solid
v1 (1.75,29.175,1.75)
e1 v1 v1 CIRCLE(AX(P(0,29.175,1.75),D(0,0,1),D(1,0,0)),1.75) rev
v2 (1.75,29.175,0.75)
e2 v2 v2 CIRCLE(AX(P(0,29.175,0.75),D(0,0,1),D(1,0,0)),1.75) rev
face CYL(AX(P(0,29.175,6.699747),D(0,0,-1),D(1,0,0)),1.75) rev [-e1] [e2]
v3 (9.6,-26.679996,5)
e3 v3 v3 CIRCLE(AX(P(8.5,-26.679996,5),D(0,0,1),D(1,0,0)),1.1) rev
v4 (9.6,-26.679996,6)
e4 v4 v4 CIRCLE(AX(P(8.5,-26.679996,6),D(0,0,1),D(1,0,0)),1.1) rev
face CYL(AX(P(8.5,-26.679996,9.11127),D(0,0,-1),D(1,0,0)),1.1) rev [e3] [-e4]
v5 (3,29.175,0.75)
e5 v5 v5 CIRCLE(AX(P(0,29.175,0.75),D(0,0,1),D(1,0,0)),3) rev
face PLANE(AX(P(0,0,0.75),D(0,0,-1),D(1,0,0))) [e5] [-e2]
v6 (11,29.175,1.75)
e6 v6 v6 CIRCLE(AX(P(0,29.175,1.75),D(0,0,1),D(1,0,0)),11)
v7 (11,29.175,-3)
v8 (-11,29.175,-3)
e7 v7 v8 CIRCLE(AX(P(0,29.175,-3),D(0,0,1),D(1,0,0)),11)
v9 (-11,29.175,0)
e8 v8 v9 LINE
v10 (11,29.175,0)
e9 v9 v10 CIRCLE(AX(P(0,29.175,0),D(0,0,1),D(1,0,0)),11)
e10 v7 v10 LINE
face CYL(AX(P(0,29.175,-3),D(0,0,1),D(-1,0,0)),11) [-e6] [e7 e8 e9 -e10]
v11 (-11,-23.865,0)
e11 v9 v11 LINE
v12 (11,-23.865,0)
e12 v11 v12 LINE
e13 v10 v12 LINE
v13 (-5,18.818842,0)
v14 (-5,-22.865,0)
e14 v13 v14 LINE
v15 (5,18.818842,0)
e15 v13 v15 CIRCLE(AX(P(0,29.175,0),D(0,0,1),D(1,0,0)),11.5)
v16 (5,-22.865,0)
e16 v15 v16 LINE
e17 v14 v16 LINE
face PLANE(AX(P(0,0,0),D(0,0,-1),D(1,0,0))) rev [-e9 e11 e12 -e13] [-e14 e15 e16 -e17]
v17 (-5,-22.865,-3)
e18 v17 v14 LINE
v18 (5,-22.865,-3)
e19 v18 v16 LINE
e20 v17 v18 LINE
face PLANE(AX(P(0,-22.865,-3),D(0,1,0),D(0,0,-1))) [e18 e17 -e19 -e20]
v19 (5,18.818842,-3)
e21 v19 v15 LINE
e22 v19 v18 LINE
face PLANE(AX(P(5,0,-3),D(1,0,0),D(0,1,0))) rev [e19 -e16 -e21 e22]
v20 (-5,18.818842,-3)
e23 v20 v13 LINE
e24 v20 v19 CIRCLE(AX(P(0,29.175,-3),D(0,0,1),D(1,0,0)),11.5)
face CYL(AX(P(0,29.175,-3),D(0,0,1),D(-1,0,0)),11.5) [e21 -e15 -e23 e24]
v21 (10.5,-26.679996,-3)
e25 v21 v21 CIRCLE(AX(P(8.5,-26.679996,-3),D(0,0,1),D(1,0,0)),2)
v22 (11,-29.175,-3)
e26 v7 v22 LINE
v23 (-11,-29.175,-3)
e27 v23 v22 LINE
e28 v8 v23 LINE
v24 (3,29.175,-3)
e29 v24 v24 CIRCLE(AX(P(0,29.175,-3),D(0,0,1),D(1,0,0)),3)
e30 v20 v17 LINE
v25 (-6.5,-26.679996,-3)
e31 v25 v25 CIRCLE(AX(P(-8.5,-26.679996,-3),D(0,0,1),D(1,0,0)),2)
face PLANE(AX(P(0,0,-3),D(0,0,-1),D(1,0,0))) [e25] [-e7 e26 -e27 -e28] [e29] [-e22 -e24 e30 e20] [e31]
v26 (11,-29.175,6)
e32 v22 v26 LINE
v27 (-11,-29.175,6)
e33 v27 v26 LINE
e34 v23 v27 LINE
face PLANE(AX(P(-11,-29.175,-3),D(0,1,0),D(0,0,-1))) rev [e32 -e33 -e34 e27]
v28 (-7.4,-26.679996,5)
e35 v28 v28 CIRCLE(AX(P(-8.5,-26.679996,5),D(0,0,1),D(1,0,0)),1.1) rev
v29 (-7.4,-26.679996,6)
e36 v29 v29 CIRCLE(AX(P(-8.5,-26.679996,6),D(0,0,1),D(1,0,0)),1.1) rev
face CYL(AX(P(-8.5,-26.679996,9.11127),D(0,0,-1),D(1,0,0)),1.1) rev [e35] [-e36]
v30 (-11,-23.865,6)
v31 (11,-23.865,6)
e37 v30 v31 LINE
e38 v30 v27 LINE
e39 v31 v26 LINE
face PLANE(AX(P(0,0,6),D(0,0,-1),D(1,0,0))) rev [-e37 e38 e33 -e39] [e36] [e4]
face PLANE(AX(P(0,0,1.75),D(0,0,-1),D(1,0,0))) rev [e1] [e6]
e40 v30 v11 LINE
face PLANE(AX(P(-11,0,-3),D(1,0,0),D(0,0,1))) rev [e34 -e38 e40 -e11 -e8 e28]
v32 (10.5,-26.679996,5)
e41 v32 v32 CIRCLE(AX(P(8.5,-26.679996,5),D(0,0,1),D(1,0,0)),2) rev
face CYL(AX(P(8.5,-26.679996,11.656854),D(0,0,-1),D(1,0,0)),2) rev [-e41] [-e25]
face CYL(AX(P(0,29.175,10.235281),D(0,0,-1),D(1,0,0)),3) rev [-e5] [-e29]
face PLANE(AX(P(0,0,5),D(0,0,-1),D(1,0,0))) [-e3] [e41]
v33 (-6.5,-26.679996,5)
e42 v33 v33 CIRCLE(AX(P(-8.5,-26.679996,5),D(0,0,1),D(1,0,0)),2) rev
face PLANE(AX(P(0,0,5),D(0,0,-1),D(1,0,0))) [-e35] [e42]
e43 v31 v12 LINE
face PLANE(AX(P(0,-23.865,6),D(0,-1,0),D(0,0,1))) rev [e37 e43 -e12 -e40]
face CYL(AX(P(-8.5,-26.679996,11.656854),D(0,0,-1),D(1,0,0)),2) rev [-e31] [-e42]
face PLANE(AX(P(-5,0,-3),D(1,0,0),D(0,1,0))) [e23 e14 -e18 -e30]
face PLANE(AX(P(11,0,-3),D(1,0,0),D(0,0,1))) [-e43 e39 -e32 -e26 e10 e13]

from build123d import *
from build123d.topology import SkipClean

# Parameters (mm, degrees)
BOSS_EXTRUDE1_DEPTH           = 3
BOSS_EXTRUDE2_START           = -1.75
SKETCH1_3_R                   = 11
BOSS_EXTRUDE2_DEPTH           = 1.75
SKETCH2_R                     = 1.75
CUT_EXTRUDE1_DEPTH            = 4.75
SKETCH2_3_R                   = 3
CUT_EXTRUDE2_DEPTH            = 3.75
SKETCH1_6_W                   = 11
SKETCH1_6_H                   = 5.31
BOSS_EXTRUDE3_DEPTH           = 6
SKETCH3_R                     = 1.1
CUT_EXTRUDE3_DEPTH            = 9
SKETCH3_3_R                   = 2
SKETCH3_3_R_2                 = 1.1
CUT_EXTRUDE4_DEPTH            = 8
BODY_MOVE_COPY1_START         = -3
BODY_MOVE_COPY1_OUTLINE_R     = 3
BODY_MOVE_COPY1_DEPTH         = 3
BODY_MOVE_COPY1_START_2       = 3
BODY_MOVE_COPY1_2_OUTLINE_W   = 22
BODY_MOVE_COPY1_2_OUTLINE_H   = 5.31
BODY_MOVE_COPY1_2_OUTLINE_R   = 2
BODY_MOVE_COPY1_2_DEPTH       = 3
BODY_MOVE_COPY1_START_3       = 0.75
BODY_MOVE_COPY1_3_OUTLINE_R   = 3
BODY_MOVE_COPY1_3_OUTLINE_R_2 = 1.75
BODY_MOVE_COPY1_3_DEPTH       = 1
BODY_MOVE_COPY1_START_4       = 5
BODY_MOVE_COPY1_4_OUTLINE_R   = 2
BODY_MOVE_COPY1_4_OUTLINE_R_2 = 1.1
BODY_MOVE_COPY1_4_DEPTH       = 1
BODY_MOVE_COPY1_5_DEPTH       = 3
BODY_MOVE_COPY1_START_5       = 1.75
BODY_MOVE_COPY1_6_OUTLINE_R   = 11
BODY_MOVE_COPY1_6_OUTLINE_R_2 = 3
BODY_MOVE_COPY1_6_DEPTH       = 1.25
BODY_MOVE_COPY1_START_6       = -6
BODY_MOVE_COPY1_7_OUTLINE_W   = 22
BODY_MOVE_COPY1_7_OUTLINE_H   = 5.31
BODY_MOVE_COPY1_7_OUTLINE_R   = 1.1
BODY_MOVE_COPY1_7_DEPTH       = 3
BODY_MOVE_COPY1_START_7       = -1.75
BODY_MOVE_COPY1_8_OUTLINE_R   = 3
BODY_MOVE_COPY1_8_OUTLINE_R_2 = 1.75
BODY_MOVE_COPY1_8_DEPTH       = 1


# Read off the part's stored shape, not the designer's step: Body-Move/Copy1
with BuildPart() as part:
    # Sketch1 → Boss-Extrude1 (new body)
    with BuildSketch(Plane.XY):
        with BuildLine():
            Line((-11, 29.175), (-11, -29.175))
            Line((-11, -29.175), (11, -29.175))
            Line((11, -29.175), (11, 29.175))
            ThreePointArc((11, 29.175), (0, 40.175), (-11, 29.175))
        make_face()
        with BuildLine():
            Line((5, -22.865), (-5, -22.865))
            Line((-5, -22.865), (-5, 18.818842411))
            ThreePointArc((-5, 18.818842411), (0, 17.675), (5, 18.818842411))
            Line((5, 18.818842411), (5, -22.865))
        make_face(mode=Mode.SUBTRACT)
    extrude(amount=BOSS_EXTRUDE1_DEPTH)

    # Sketch1<3> → Boss-Extrude2 (add)
    with BuildSketch(Plane.XY.offset(BOSS_EXTRUDE2_START)):
        with Locations((0, 29.175)):
            Circle(SKETCH1_3_R)
    extrude(amount=BOSS_EXTRUDE2_DEPTH)

    # Sketch2 → Cut-Extrude1 (cut)
    with BuildSketch(Plane.XY.offset(3)):
        with Locations((0, 29.175)):
            Circle(SKETCH2_R)
    extrude(amount=-CUT_EXTRUDE1_DEPTH, mode=Mode.SUBTRACT)

    # Sketch2<3> → Cut-Extrude2 (cut)
    with BuildSketch(Plane.XY.offset(3)):
        with Locations((0, 29.175)):
            Circle(SKETCH2_3_R)
    extrude(amount=-CUT_EXTRUDE2_DEPTH, mode=Mode.SUBTRACT)

    # Sketch1<6> → Boss-Extrude3 (add)
    with BuildSketch(Plane.XY):
        with Locations((5.5, -26.52)):
            Rectangle(SKETCH1_6_W, SKETCH1_6_H)
        with Locations((-5.5, -26.52)):
            Rectangle(SKETCH1_6_W, SKETCH1_6_H)
    extrude(amount=-BOSS_EXTRUDE3_DEPTH)

    # Sketch3 → Cut-Extrude3 (cut)
    with BuildSketch(Plane.XY.offset(3)):
        with Locations((-8.5, -26.67999607)):
            Circle(SKETCH3_R)
        with Locations((8.5, -26.67999607)):
            Circle(SKETCH3_R)
    extrude(amount=-CUT_EXTRUDE3_DEPTH, mode=Mode.SUBTRACT)

    # Sketch3<3> → Cut-Extrude4 (cut)
    # profile 1 of 2: a face of its own
    with BuildSketch(Plane.XY.offset(3)):
        with Locations((-8.5, -26.67999607)):
            Circle(SKETCH3_3_R)
        with Locations((-8.5, -26.67999607)):
            Circle(SKETCH3_3_R_2, mode=Mode.SUBTRACT)
    # profile 2 of 2: a face of its own
    with BuildSketch(Plane.XY.offset(3)):
        with Locations((8.5, -26.67999607)):
            Circle(SKETCH3_3_R)
        with Locations((8.5, -26.67999607)):
            Circle(SKETCH3_3_R_2, mode=Mode.SUBTRACT)
    extrude(amount=-CUT_EXTRUDE4_DEPTH, mode=Mode.SUBTRACT)

    # Body-Move/Copy1 outline → Body-Move/Copy1 (add)
    with BuildSketch(Plane.XY.offset(BODY_MOVE_COPY1_START)):
        with BuildLine():
            Line((-11, 29.175), (-11, -23.865))
            Line((-11, -23.865), (11, -23.865))
            Line((11, -23.865), (11, 29.175))
            ThreePointArc((11, 29.175), (0, 40.175), (-11, 29.175))
        make_face()
        with BuildLine():
            Line((-5, -22.865), (-5, 18.818842411))
            ThreePointArc((-5, 18.818842411), (0, 17.675), (5, 18.818842411))
            Line((5, 18.818842411), (5, -22.865))
            Line((5, -22.865), (-5, -22.865))
        make_face(mode=Mode.SUBTRACT)
        with Locations((0, 29.175)):
            Circle(BODY_MOVE_COPY1_OUTLINE_R, mode=Mode.SUBTRACT)
    extrude(amount=BODY_MOVE_COPY1_DEPTH)

    # Body-Move_Copy1 2 outline → Body-Move_Copy1 2 (add)
    with BuildSketch(Plane.XY.offset(BODY_MOVE_COPY1_START_2)):
        with Locations((0, -26.52)):
            Rectangle(BODY_MOVE_COPY1_2_OUTLINE_W, BODY_MOVE_COPY1_2_OUTLINE_H)
        with Locations((-8.5, -26.67999607)):
            Circle(BODY_MOVE_COPY1_2_OUTLINE_R, mode=Mode.SUBTRACT)
        with Locations((8.5, -26.67999607)):
            Circle(BODY_MOVE_COPY1_2_OUTLINE_R, mode=Mode.SUBTRACT)
    extrude(amount=BODY_MOVE_COPY1_2_DEPTH)

    # Body-Move_Copy1 3 outline → Body-Move_Copy1 3 (add)
    with BuildSketch(Plane.XY.offset(BODY_MOVE_COPY1_START_3)):
        with Locations((0, 29.175)):
            Circle(BODY_MOVE_COPY1_3_OUTLINE_R)
        with Locations((0, 29.175)):
            Circle(BODY_MOVE_COPY1_3_OUTLINE_R_2, mode=Mode.SUBTRACT)
    extrude(amount=BODY_MOVE_COPY1_3_DEPTH)

    # Body-Move_Copy1 4 outline → Body-Move_Copy1 4 (add)
    # profile 1 of 2: a face of its own
    with BuildSketch(Plane.XY.offset(BODY_MOVE_COPY1_START_4)):
        with Locations((-8.5, -26.67999607)):
            Circle(BODY_MOVE_COPY1_4_OUTLINE_R)
        with Locations((-8.5, -26.67999607)):
            Circle(BODY_MOVE_COPY1_4_OUTLINE_R_2, mode=Mode.SUBTRACT)
    # profile 2 of 2: a face of its own
    with BuildSketch(Plane.XY.offset(BODY_MOVE_COPY1_START_4)):
        with Locations((8.5, -26.67999607)):
            Circle(BODY_MOVE_COPY1_4_OUTLINE_R)
        with Locations((8.5, -26.67999607)):
            Circle(BODY_MOVE_COPY1_4_OUTLINE_R_2, mode=Mode.SUBTRACT)
    extrude(amount=BODY_MOVE_COPY1_4_DEPTH)

    # Body-Move_Copy1 5 outline → Body-Move_Copy1 5 (cut)
    with SkipClean():  # the faces are left unmerged after this step: merging them gives an invalid solid
        with BuildSketch(Plane.XY):
            with BuildLine():
                Line((-11, 29.175), (-11, -23.865))
                Line((-11, -23.865), (11, -23.865))
                Line((11, -23.865), (11, 29.175))
                ThreePointArc((11, 29.175), (0, 18.175), (-11, 29.175))
            make_face()
            with BuildLine():
                Line((-5, -22.865), (-5, 18.818842411))
                ThreePointArc((-5, 18.818842411), (0, 17.675), (5, 18.818842411))
                Line((5, 18.818842411), (5, -22.865))
                Line((5, -22.865), (-5, -22.865))
            make_face(mode=Mode.SUBTRACT)
        extrude(amount=BODY_MOVE_COPY1_5_DEPTH, mode=Mode.SUBTRACT)

    # Body-Move_Copy1 6 outline → Body-Move_Copy1 6 (cut)
    with BuildSketch(Plane.XY.offset(BODY_MOVE_COPY1_START_5)):
        with Locations((0, 29.175)):
            Circle(BODY_MOVE_COPY1_6_OUTLINE_R)
        with Locations((0, 29.175)):
            Circle(BODY_MOVE_COPY1_6_OUTLINE_R_2, mode=Mode.SUBTRACT)
    extrude(amount=BODY_MOVE_COPY1_6_DEPTH, mode=Mode.SUBTRACT)

    # Body-Move_Copy1 7 outline → Body-Move_Copy1 7 (cut)
    with BuildSketch(Plane.XY.offset(BODY_MOVE_COPY1_START_6)):
        with Locations((0, -26.52)):
            Rectangle(BODY_MOVE_COPY1_7_OUTLINE_W, BODY_MOVE_COPY1_7_OUTLINE_H)
        with Locations((-8.5, -26.67999607)):
            Circle(BODY_MOVE_COPY1_7_OUTLINE_R, mode=Mode.SUBTRACT)
        with Locations((8.5, -26.67999607)):
            Circle(BODY_MOVE_COPY1_7_OUTLINE_R, mode=Mode.SUBTRACT)
    extrude(amount=BODY_MOVE_COPY1_7_DEPTH, mode=Mode.SUBTRACT)

    # Body-Move_Copy1 8 outline → Body-Move_Copy1 8 (cut)
    with SkipClean():  # the faces are left unmerged after this step: merging them gives an invalid solid
        with BuildSketch(Plane.XY.offset(BODY_MOVE_COPY1_START_7)):
            with Locations((0, 29.175)):
                Circle(BODY_MOVE_COPY1_8_OUTLINE_R)
            with Locations((0, 29.175)):
                Circle(BODY_MOVE_COPY1_8_OUTLINE_R_2, mode=Mode.SUBTRACT)
        extrude(amount=BODY_MOVE_COPY1_8_DEPTH, mode=Mode.SUBTRACT)
    add(part.part.scale(1), mode=Mode.REPLACE)  # the faces are merged on a copy


solid = part.part
